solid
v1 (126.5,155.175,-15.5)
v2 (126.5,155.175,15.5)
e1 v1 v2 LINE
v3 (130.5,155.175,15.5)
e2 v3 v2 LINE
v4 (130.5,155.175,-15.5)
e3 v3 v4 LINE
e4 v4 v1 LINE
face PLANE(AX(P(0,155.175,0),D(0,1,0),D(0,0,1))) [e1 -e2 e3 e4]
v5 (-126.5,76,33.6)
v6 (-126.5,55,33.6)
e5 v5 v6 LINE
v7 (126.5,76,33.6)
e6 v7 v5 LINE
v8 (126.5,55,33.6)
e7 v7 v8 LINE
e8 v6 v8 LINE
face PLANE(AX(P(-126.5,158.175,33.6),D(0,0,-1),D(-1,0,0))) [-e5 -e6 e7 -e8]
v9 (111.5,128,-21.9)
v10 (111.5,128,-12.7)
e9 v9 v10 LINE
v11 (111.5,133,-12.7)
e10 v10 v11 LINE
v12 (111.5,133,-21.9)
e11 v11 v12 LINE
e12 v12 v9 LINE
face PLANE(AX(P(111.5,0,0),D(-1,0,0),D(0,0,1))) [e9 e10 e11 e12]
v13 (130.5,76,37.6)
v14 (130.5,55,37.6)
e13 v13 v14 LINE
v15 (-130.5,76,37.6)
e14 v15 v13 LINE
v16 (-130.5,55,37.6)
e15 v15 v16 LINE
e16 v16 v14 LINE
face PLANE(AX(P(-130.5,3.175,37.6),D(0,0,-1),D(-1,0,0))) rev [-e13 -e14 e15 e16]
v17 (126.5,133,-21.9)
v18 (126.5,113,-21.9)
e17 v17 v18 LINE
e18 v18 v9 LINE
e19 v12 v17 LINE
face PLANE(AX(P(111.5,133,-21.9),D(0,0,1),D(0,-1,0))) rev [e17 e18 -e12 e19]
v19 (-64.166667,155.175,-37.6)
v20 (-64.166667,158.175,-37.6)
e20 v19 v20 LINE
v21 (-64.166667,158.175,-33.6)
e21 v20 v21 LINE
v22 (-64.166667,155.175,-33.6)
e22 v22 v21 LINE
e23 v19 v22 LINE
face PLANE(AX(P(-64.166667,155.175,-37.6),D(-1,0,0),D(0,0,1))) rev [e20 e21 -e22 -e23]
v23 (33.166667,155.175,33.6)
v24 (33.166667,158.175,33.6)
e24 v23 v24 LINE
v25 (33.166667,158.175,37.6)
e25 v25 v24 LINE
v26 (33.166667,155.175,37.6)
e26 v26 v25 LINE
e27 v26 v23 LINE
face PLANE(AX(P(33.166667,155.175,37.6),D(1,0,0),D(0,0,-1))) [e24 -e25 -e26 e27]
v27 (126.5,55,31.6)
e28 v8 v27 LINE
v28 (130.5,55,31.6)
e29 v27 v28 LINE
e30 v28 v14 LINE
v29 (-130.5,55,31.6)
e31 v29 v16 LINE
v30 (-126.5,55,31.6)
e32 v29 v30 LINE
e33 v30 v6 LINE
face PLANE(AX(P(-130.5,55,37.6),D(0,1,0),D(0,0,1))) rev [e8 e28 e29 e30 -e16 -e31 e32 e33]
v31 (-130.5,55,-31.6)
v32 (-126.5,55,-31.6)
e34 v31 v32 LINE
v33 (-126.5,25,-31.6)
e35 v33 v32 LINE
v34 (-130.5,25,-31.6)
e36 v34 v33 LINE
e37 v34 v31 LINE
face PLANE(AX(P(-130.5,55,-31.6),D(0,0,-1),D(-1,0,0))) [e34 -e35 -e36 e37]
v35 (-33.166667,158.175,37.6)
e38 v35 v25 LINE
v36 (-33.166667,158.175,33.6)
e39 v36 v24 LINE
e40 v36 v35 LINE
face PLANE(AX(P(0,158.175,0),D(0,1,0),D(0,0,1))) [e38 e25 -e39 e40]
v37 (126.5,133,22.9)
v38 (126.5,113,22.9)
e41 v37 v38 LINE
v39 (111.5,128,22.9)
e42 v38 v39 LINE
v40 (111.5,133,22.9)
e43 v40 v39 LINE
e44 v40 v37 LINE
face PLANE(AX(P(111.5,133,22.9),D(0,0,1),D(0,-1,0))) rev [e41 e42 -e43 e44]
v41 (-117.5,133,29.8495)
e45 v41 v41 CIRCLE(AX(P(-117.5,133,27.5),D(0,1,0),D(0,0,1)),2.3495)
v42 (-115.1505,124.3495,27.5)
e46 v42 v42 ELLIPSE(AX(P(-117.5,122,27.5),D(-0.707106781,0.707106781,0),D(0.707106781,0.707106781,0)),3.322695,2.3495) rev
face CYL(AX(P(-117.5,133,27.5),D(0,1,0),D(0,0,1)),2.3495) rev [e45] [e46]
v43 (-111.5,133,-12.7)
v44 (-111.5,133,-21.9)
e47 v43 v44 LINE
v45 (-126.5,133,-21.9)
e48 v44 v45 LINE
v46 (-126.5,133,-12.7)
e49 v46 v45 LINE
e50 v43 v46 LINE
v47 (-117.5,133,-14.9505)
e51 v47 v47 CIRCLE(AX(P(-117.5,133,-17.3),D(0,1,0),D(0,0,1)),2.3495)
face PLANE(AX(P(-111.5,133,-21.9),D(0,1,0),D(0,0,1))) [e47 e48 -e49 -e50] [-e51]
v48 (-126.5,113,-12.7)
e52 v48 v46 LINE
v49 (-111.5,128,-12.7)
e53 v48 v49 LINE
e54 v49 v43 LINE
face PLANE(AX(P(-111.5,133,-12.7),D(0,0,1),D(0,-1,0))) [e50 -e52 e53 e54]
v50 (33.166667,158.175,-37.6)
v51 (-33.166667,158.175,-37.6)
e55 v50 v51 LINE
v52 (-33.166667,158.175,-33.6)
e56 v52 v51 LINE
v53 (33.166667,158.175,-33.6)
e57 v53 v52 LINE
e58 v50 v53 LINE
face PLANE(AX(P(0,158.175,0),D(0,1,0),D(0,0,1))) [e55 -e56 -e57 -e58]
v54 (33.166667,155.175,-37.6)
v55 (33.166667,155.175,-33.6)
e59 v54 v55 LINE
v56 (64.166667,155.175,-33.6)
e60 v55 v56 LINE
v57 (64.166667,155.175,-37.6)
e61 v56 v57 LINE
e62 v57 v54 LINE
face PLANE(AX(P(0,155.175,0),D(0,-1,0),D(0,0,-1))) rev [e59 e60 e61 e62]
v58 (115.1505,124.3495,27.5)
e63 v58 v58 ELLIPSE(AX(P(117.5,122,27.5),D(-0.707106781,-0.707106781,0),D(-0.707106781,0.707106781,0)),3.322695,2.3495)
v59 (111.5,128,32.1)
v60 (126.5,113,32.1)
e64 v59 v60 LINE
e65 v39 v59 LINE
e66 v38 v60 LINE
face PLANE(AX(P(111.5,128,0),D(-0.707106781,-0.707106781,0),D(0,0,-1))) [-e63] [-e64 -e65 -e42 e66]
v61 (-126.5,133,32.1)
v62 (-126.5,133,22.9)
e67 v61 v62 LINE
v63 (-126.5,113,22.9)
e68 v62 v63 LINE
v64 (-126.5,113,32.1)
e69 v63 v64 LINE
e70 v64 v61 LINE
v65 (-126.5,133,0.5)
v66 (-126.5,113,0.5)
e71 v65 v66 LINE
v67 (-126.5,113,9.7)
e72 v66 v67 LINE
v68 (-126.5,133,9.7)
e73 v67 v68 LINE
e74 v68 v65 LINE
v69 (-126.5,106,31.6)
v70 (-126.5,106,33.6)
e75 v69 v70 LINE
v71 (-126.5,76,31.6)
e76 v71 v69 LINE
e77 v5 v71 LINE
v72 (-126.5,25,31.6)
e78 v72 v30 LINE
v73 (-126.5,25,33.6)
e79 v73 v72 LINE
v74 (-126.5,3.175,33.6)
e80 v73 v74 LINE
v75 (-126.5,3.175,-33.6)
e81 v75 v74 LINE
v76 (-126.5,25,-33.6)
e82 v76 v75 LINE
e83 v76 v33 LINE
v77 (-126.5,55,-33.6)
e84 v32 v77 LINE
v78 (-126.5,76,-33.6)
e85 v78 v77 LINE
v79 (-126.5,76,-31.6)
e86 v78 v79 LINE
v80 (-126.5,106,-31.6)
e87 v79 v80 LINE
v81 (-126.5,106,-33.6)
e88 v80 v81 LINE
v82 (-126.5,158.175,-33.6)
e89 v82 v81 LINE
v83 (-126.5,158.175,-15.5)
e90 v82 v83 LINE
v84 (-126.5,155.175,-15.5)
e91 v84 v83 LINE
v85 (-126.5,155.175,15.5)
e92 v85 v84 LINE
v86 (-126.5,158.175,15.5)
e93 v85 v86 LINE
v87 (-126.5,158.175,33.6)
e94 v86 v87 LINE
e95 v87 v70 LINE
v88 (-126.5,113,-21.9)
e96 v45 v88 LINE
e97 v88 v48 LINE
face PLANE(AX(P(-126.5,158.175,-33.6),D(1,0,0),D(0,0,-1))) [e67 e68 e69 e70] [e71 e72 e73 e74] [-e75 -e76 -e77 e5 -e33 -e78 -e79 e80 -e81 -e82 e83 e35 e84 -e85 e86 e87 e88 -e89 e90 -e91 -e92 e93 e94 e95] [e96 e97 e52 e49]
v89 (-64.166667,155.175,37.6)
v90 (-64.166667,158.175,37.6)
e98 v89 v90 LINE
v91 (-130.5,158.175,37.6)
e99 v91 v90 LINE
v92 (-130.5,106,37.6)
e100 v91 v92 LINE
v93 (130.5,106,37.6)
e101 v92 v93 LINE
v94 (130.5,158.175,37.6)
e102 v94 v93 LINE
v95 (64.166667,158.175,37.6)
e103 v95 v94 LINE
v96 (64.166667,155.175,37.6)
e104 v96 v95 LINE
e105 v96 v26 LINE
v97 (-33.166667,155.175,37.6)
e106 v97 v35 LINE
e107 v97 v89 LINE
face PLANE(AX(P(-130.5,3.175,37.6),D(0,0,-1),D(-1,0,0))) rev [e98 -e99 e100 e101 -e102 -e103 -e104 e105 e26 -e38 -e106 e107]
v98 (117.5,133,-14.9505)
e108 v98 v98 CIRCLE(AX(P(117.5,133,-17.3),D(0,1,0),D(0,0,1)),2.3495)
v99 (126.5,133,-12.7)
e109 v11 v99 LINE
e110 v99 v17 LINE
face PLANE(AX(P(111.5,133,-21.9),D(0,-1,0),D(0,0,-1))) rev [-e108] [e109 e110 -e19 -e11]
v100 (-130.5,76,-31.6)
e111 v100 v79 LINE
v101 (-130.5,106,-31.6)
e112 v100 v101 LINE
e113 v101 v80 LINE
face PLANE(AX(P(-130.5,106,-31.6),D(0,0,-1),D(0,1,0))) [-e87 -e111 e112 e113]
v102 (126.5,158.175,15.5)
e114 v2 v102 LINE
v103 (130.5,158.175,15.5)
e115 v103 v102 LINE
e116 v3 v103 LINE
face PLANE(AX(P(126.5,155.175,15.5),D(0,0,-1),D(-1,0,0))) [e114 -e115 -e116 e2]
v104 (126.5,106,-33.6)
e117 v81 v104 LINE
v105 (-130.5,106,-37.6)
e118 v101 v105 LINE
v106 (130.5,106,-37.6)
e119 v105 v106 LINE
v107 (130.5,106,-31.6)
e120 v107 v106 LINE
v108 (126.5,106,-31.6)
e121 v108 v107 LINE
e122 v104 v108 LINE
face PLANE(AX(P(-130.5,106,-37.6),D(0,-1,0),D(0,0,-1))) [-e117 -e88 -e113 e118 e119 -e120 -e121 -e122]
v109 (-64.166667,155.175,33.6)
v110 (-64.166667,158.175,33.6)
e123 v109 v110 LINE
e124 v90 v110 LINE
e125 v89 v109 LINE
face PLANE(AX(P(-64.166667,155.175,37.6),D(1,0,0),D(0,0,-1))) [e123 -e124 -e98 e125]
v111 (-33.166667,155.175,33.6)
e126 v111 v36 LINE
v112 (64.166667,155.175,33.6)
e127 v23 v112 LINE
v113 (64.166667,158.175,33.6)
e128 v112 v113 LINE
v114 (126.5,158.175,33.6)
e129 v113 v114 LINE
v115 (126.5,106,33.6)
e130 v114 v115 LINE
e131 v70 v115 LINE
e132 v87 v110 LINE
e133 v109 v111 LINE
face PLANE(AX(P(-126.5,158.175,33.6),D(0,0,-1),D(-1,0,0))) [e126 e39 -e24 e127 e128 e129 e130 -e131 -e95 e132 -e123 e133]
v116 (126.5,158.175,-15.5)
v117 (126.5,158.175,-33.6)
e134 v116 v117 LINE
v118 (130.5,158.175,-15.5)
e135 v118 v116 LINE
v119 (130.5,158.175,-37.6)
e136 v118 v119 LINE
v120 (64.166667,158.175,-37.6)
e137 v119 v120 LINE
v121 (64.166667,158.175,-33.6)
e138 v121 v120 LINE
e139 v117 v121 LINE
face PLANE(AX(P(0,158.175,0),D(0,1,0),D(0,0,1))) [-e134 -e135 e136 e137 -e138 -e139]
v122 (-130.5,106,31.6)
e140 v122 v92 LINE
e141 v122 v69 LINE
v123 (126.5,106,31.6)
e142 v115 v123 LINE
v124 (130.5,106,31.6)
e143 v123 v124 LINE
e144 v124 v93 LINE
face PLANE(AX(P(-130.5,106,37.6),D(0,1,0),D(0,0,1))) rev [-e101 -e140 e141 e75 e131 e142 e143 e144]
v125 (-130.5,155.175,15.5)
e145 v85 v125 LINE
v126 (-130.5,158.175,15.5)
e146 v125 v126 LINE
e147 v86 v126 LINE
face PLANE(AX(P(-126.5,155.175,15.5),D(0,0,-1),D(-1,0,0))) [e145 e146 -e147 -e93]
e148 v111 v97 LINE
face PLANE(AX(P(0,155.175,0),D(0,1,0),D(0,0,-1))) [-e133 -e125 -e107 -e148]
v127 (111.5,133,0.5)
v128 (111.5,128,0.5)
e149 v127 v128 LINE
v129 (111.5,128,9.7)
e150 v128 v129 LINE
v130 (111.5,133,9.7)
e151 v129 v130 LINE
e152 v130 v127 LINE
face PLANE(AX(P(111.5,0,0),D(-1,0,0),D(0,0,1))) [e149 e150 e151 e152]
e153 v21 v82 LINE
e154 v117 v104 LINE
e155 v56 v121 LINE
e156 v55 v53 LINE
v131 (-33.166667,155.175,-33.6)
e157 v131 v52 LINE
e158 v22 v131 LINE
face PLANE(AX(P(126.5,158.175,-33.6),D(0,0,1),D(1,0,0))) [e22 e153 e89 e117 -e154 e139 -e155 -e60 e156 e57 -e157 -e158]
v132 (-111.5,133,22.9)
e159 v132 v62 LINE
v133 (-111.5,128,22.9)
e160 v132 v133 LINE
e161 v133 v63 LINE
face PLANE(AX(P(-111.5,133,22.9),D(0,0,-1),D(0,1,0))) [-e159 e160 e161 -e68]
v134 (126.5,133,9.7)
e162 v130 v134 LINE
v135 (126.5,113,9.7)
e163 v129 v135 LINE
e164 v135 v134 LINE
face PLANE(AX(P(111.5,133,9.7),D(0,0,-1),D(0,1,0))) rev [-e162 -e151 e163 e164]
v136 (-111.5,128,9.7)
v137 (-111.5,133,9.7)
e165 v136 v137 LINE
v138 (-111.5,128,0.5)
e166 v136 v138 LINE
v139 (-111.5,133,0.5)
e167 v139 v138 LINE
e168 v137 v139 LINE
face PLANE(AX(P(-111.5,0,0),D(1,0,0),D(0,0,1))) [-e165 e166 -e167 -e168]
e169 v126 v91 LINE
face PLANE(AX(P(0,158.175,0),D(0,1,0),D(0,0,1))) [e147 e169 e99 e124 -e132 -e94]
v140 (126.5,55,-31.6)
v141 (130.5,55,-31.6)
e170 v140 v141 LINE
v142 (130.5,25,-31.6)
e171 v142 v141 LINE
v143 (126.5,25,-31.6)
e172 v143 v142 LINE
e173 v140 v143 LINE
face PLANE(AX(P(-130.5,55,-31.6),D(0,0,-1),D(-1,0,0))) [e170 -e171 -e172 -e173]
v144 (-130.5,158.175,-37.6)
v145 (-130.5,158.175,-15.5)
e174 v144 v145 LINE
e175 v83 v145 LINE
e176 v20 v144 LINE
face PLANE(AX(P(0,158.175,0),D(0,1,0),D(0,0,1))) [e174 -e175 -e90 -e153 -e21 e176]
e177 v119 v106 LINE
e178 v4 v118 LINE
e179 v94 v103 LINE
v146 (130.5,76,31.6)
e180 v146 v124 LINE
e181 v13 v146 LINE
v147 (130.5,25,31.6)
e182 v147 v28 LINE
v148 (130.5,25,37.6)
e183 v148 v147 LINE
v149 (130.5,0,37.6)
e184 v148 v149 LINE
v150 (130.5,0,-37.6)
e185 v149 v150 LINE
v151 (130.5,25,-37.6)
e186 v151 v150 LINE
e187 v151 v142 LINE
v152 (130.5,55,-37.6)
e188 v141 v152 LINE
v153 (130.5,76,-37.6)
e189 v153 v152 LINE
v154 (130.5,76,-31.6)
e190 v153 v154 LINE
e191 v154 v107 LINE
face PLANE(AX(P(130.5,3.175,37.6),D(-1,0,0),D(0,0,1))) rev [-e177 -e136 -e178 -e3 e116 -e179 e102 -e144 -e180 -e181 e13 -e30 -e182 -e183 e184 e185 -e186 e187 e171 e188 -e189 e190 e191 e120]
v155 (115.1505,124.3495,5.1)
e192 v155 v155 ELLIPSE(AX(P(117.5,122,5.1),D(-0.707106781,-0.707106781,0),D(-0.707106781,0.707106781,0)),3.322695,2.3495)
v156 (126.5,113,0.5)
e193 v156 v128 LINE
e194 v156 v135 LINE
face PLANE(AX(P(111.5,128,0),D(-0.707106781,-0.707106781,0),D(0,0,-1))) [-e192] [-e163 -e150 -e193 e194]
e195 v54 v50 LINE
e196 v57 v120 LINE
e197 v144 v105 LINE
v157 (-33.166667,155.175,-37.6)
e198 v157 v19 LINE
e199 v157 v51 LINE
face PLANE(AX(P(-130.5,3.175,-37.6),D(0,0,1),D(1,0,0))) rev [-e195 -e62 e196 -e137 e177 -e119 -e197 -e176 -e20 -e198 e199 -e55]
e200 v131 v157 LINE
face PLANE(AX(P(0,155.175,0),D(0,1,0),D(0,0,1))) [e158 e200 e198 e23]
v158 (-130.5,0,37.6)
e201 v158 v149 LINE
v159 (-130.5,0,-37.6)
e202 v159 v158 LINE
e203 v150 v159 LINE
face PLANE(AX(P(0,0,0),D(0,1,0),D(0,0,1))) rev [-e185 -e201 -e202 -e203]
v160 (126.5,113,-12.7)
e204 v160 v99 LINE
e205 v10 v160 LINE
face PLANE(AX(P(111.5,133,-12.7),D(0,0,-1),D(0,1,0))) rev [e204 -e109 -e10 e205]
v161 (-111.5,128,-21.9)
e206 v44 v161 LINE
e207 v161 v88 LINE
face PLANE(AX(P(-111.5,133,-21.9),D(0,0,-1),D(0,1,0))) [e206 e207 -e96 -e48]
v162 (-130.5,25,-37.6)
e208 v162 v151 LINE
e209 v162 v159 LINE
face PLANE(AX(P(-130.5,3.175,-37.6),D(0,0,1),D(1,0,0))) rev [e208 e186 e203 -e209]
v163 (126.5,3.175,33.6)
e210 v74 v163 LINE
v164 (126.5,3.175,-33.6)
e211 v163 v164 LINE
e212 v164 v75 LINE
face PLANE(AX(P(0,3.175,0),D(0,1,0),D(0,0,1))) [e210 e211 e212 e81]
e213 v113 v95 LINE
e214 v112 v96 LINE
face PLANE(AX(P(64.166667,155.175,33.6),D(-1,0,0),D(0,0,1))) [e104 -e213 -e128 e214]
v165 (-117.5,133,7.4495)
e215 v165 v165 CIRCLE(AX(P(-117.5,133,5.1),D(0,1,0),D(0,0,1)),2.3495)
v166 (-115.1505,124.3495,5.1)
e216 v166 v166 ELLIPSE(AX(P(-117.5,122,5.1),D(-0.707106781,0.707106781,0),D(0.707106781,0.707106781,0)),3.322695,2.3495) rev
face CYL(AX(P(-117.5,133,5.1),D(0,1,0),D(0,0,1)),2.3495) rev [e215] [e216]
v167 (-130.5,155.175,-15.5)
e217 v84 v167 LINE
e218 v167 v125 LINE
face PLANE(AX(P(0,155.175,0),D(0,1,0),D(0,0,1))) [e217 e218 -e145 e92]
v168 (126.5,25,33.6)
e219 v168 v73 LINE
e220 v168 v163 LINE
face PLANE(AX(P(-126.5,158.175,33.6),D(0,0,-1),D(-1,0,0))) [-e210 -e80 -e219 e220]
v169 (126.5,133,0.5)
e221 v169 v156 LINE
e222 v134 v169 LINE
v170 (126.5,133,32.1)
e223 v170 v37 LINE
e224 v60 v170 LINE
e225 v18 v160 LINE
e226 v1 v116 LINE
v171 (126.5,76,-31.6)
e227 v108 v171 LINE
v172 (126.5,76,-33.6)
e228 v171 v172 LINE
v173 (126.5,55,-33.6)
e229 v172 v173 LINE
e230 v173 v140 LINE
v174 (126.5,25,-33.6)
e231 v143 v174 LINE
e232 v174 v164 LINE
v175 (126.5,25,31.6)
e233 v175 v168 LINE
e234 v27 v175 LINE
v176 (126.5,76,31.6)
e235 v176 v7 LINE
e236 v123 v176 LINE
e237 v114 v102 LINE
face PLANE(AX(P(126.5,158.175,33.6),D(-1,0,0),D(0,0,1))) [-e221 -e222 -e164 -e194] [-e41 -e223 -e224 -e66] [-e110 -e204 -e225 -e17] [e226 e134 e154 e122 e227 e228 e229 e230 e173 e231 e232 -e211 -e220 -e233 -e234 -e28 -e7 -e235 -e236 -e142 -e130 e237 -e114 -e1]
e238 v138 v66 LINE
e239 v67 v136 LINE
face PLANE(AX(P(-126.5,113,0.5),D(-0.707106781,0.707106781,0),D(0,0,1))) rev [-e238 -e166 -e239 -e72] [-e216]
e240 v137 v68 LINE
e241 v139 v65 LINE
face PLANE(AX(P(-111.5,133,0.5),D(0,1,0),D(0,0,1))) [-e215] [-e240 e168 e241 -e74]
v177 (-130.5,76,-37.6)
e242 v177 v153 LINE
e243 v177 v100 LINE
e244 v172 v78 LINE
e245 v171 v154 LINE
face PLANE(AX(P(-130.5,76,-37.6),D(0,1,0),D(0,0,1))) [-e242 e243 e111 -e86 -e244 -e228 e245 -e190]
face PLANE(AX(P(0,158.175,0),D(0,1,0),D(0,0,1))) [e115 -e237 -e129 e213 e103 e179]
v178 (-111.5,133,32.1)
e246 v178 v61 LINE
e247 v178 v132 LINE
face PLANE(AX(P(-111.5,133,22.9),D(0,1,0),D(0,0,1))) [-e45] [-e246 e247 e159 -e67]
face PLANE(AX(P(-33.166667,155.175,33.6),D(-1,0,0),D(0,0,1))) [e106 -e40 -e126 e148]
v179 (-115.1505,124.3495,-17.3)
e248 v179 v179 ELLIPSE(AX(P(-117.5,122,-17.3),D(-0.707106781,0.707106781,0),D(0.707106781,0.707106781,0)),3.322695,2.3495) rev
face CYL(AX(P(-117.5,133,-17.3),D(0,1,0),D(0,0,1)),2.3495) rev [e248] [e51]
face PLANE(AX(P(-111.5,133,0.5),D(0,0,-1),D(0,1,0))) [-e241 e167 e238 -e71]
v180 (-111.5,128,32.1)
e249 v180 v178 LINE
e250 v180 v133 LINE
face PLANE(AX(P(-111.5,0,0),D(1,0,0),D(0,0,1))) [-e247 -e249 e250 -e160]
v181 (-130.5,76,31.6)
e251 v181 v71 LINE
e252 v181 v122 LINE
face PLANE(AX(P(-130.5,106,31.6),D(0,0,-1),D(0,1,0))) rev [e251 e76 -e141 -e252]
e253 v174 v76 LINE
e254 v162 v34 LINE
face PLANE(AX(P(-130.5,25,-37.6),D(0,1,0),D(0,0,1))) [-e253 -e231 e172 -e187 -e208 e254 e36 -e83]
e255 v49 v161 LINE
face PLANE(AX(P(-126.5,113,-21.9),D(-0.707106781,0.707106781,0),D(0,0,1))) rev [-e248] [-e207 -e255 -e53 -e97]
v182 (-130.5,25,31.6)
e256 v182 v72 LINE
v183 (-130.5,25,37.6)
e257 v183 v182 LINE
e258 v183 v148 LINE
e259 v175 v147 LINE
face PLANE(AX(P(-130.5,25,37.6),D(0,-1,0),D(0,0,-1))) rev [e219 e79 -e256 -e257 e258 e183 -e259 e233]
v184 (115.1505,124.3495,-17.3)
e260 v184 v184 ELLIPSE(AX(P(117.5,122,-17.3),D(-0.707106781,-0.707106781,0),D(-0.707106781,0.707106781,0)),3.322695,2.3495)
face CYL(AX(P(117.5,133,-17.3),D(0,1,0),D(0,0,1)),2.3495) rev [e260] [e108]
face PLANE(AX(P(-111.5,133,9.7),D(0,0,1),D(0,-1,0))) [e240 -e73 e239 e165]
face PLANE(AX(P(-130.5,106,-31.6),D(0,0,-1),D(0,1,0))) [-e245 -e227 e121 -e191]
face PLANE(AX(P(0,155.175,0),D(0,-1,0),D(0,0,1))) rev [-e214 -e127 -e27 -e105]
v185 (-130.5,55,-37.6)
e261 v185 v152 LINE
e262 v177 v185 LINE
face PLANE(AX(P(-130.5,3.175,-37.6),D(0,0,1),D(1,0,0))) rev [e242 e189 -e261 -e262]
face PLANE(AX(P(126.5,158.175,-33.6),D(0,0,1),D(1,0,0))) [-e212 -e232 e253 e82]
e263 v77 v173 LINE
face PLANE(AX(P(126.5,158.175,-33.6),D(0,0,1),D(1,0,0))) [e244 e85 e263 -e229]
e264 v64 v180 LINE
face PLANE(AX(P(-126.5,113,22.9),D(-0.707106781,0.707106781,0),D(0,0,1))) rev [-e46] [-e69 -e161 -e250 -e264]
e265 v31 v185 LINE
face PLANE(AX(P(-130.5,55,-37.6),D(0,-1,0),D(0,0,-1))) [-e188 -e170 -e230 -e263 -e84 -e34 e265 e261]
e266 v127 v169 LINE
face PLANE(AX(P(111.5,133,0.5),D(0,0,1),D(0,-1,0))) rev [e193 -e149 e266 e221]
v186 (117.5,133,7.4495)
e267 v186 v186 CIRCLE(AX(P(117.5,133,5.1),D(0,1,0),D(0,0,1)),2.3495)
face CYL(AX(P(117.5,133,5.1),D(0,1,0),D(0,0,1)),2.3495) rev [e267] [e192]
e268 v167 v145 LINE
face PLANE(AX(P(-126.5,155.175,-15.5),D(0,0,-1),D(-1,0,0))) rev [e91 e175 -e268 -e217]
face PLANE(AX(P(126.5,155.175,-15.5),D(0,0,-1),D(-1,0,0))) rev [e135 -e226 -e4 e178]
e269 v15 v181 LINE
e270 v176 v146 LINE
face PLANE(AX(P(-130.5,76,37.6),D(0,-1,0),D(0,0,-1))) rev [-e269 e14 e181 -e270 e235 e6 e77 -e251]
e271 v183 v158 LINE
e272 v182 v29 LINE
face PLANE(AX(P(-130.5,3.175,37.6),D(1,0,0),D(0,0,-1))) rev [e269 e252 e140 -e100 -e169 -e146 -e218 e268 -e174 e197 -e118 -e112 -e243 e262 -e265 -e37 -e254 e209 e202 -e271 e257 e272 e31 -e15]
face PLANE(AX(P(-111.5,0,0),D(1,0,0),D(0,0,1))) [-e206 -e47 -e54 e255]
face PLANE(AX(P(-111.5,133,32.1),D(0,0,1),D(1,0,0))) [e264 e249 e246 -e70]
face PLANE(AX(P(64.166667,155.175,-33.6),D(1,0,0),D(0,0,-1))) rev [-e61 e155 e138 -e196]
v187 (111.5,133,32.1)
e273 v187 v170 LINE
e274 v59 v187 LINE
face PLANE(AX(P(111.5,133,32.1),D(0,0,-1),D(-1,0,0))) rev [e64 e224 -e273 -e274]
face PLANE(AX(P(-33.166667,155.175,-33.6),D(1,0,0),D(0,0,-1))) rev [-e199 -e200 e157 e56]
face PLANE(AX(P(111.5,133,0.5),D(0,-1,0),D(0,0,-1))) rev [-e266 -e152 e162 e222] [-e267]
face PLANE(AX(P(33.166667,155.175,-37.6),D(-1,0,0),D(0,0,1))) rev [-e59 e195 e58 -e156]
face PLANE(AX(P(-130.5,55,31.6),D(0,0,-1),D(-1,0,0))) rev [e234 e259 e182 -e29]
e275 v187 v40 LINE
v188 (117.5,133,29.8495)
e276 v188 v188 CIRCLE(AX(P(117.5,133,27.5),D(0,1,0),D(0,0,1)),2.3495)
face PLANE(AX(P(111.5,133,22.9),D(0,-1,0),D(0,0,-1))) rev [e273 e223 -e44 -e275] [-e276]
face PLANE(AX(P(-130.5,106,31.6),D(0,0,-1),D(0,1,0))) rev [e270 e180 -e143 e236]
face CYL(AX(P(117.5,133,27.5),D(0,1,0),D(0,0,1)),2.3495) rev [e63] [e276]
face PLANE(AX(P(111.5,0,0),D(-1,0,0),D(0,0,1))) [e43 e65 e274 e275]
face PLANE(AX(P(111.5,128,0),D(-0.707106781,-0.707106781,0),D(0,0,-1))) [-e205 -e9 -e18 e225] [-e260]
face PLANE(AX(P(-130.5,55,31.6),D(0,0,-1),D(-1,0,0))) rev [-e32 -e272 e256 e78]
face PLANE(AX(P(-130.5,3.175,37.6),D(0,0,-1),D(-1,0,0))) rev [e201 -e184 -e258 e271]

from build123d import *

# Parameters (mm, degrees)
SKETCH1_W                        = 261
SKETCH1_H                        = 75.2
BOSS_EXTRUDE1_DEPTH              = 3.175
SKETCH2_W                        = 261
SKETCH2_H                        = 75.2
SKETCH2_W_2                      = 253
SKETCH2_H_2                      = 67.2
BOSS_EXTRUDE2_DEPTH              = 155
SKETCH3_W                        = 6
SKETCH3_H                        = 30
CUT_EXTRUDE1_DEPTH               = 308.496488801
SKETCH4_W                        = 9.2
SKETCH4_H                        = 20
BOSS_EXTRUDE3_DEPTH              = 15
CHAMFER2_SIZE                    = 15
F_13_0_185_DIAMETER_HOLE1_REACH  = 192.087
F_13_0_185_DIAMETER_HOLE1_BORE_R = 2.3495
LPATTERN1_COUNT                  = 3
LPATTERN1_PITCH                  = 22.4
SKETCH7_W                        = 4
SKETCH7_H                        = 15.5
SKETCH7_W_2                      = 31
SKETCH7_H_2                      = 4
CUT_EXTRUDE2_DEPTH               = 3


# Read off the part's stored shape, not the designer's step: Mirror2
with BuildPart() as part:
    # Sketch1 → Boss-Extrude1 (new body)
    with BuildSketch(Plane(origin=(0, 0, 0), x_dir=(1, 0, 0), z_dir=(0, 1, 0))):
        Rectangle(SKETCH1_W, SKETCH1_H)
    extrude(amount=BOSS_EXTRUDE1_DEPTH)

    # Sketch2 → Boss-Extrude2 (add)
    with BuildSketch(Plane(origin=(0, 3.175, 0), x_dir=(1, 0, 0), z_dir=(0, 1, 0))):
        Rectangle(SKETCH2_W, SKETCH2_H)
        Rectangle(SKETCH2_W_2, SKETCH2_H_2, mode=Mode.SUBTRACT)
    extrude(amount=BOSS_EXTRUDE2_DEPTH)

    # Sketch3 → Cut-Extrude1 (cut, through all)
    with BuildSketch(Plane(origin=(130.5, 0, 0), x_dir=(0, 0, -1), z_dir=(1, 0, 0))):
        with Locations((-34.6, 91)):
            Rectangle(SKETCH3_W, SKETCH3_H)
        with Locations((-34.6, 40)):
            Rectangle(SKETCH3_W, SKETCH3_H)
    cut_extrude1 = extrude(amount=-CUT_EXTRUDE1_DEPTH, mode=Mode.SUBTRACT)

    # Mirror1: Cut-Extrude1 across plane
    add(cut_extrude1.mirror(Plane.XY), mode=Mode.SUBTRACT)

    # Sketch4 → Boss-Extrude3 (add)
    with BuildSketch(Plane.ZY.offset(-126.5)):
        with Locations((-17.3, 123)):
            Rectangle(SKETCH4_W, SKETCH4_H)
        with Locations((27.5, 123)):
            Rectangle(SKETCH4_W, SKETCH4_H)
        with Locations((5.1, 123)):
            Rectangle(SKETCH4_W, SKETCH4_H)
    extrude(amount=BOSS_EXTRUDE3_DEPTH)

    # Chamfer2
    chamfer2_edges = [part.edges().sort_by_distance(p)[0] for p in [
        (111.5, 113, 27.5),
        (111.5, 113, 5.1),
        (111.5, 113, -17.3),
    ]]
    chamfer(chamfer2_edges, length=CHAMFER2_SIZE - 0.0001)  # a hair under: the kernel refuses the full size

    # #13 (0.185) Diameter Hole1 bore → #13 (0.185) Diameter Hole1 (cut, up to next)
    with BuildSketch(Plane(origin=(0, 133, 0), x_dir=(1, 0, 0), z_dir=(0, 1, 0)), mode=Mode.PRIVATE) as f_13_0_185_diameter_hole1_sk1:
        with Locations((117.5, -27.5)):
            Circle(F_13_0_185_DIAMETER_HOLE1_BORE_R)
    f_13_0_185_diameter_hole1_tool1 = extrude(f_13_0_185_diameter_hole1_sk1.sketch, amount=-F_13_0_185_DIAMETER_HOLE1_REACH, mode=Mode.PRIVATE) & part.part
    f_13_0_185_diameter_hole1 = f_13_0_185_diameter_hole1_tool1.solids().sort_by_distance((117.5, 133, 27.5))[0]
    add(f_13_0_185_diameter_hole1, mode=Mode.SUBTRACT)

    # LPattern1: #13 (0.185) Diameter Hole1 ×3
    with Locations(*[(0, 0, -i * LPATTERN1_PITCH) for i in range(1, LPATTERN1_COUNT)]):
        add(f_13_0_185_diameter_hole1, mode=Mode.SUBTRACT)

    # Mirror2: part across plane


with BuildPart() as part_1:
    add(part.part)
    add(part.part.mirror(Plane(origin=(0, 0, 0), x_dir=(0, 0, 1), z_dir=(1, 0, 0))))

    # Sketch7 → Cut-Extrude2 (cut)
    with BuildSketch(Plane(origin=(0, 158.175, 0), x_dir=(1, 0, 0), z_dir=(0, 1, 0))):
        with Locations((128.5, 7.75)):
            Rectangle(SKETCH7_W, SKETCH7_H)
        with Locations((48.666666667, 35.6)):
            Rectangle(SKETCH7_W_2, SKETCH7_H_2)
        with Locations((-128.5, 7.75)):
            Rectangle(SKETCH7_W, SKETCH7_H)
        with Locations((-48.666666667, 35.6)):
            Rectangle(SKETCH7_W_2, SKETCH7_H_2)
    cut_extrude2 = extrude(amount=-CUT_EXTRUDE2_DEPTH, mode=Mode.SUBTRACT)

    # Mirror3: Cut-Extrude2 across plane
    add(cut_extrude2.mirror(Plane.XY), mode=Mode.SUBTRACT)


solid = part_1.part
